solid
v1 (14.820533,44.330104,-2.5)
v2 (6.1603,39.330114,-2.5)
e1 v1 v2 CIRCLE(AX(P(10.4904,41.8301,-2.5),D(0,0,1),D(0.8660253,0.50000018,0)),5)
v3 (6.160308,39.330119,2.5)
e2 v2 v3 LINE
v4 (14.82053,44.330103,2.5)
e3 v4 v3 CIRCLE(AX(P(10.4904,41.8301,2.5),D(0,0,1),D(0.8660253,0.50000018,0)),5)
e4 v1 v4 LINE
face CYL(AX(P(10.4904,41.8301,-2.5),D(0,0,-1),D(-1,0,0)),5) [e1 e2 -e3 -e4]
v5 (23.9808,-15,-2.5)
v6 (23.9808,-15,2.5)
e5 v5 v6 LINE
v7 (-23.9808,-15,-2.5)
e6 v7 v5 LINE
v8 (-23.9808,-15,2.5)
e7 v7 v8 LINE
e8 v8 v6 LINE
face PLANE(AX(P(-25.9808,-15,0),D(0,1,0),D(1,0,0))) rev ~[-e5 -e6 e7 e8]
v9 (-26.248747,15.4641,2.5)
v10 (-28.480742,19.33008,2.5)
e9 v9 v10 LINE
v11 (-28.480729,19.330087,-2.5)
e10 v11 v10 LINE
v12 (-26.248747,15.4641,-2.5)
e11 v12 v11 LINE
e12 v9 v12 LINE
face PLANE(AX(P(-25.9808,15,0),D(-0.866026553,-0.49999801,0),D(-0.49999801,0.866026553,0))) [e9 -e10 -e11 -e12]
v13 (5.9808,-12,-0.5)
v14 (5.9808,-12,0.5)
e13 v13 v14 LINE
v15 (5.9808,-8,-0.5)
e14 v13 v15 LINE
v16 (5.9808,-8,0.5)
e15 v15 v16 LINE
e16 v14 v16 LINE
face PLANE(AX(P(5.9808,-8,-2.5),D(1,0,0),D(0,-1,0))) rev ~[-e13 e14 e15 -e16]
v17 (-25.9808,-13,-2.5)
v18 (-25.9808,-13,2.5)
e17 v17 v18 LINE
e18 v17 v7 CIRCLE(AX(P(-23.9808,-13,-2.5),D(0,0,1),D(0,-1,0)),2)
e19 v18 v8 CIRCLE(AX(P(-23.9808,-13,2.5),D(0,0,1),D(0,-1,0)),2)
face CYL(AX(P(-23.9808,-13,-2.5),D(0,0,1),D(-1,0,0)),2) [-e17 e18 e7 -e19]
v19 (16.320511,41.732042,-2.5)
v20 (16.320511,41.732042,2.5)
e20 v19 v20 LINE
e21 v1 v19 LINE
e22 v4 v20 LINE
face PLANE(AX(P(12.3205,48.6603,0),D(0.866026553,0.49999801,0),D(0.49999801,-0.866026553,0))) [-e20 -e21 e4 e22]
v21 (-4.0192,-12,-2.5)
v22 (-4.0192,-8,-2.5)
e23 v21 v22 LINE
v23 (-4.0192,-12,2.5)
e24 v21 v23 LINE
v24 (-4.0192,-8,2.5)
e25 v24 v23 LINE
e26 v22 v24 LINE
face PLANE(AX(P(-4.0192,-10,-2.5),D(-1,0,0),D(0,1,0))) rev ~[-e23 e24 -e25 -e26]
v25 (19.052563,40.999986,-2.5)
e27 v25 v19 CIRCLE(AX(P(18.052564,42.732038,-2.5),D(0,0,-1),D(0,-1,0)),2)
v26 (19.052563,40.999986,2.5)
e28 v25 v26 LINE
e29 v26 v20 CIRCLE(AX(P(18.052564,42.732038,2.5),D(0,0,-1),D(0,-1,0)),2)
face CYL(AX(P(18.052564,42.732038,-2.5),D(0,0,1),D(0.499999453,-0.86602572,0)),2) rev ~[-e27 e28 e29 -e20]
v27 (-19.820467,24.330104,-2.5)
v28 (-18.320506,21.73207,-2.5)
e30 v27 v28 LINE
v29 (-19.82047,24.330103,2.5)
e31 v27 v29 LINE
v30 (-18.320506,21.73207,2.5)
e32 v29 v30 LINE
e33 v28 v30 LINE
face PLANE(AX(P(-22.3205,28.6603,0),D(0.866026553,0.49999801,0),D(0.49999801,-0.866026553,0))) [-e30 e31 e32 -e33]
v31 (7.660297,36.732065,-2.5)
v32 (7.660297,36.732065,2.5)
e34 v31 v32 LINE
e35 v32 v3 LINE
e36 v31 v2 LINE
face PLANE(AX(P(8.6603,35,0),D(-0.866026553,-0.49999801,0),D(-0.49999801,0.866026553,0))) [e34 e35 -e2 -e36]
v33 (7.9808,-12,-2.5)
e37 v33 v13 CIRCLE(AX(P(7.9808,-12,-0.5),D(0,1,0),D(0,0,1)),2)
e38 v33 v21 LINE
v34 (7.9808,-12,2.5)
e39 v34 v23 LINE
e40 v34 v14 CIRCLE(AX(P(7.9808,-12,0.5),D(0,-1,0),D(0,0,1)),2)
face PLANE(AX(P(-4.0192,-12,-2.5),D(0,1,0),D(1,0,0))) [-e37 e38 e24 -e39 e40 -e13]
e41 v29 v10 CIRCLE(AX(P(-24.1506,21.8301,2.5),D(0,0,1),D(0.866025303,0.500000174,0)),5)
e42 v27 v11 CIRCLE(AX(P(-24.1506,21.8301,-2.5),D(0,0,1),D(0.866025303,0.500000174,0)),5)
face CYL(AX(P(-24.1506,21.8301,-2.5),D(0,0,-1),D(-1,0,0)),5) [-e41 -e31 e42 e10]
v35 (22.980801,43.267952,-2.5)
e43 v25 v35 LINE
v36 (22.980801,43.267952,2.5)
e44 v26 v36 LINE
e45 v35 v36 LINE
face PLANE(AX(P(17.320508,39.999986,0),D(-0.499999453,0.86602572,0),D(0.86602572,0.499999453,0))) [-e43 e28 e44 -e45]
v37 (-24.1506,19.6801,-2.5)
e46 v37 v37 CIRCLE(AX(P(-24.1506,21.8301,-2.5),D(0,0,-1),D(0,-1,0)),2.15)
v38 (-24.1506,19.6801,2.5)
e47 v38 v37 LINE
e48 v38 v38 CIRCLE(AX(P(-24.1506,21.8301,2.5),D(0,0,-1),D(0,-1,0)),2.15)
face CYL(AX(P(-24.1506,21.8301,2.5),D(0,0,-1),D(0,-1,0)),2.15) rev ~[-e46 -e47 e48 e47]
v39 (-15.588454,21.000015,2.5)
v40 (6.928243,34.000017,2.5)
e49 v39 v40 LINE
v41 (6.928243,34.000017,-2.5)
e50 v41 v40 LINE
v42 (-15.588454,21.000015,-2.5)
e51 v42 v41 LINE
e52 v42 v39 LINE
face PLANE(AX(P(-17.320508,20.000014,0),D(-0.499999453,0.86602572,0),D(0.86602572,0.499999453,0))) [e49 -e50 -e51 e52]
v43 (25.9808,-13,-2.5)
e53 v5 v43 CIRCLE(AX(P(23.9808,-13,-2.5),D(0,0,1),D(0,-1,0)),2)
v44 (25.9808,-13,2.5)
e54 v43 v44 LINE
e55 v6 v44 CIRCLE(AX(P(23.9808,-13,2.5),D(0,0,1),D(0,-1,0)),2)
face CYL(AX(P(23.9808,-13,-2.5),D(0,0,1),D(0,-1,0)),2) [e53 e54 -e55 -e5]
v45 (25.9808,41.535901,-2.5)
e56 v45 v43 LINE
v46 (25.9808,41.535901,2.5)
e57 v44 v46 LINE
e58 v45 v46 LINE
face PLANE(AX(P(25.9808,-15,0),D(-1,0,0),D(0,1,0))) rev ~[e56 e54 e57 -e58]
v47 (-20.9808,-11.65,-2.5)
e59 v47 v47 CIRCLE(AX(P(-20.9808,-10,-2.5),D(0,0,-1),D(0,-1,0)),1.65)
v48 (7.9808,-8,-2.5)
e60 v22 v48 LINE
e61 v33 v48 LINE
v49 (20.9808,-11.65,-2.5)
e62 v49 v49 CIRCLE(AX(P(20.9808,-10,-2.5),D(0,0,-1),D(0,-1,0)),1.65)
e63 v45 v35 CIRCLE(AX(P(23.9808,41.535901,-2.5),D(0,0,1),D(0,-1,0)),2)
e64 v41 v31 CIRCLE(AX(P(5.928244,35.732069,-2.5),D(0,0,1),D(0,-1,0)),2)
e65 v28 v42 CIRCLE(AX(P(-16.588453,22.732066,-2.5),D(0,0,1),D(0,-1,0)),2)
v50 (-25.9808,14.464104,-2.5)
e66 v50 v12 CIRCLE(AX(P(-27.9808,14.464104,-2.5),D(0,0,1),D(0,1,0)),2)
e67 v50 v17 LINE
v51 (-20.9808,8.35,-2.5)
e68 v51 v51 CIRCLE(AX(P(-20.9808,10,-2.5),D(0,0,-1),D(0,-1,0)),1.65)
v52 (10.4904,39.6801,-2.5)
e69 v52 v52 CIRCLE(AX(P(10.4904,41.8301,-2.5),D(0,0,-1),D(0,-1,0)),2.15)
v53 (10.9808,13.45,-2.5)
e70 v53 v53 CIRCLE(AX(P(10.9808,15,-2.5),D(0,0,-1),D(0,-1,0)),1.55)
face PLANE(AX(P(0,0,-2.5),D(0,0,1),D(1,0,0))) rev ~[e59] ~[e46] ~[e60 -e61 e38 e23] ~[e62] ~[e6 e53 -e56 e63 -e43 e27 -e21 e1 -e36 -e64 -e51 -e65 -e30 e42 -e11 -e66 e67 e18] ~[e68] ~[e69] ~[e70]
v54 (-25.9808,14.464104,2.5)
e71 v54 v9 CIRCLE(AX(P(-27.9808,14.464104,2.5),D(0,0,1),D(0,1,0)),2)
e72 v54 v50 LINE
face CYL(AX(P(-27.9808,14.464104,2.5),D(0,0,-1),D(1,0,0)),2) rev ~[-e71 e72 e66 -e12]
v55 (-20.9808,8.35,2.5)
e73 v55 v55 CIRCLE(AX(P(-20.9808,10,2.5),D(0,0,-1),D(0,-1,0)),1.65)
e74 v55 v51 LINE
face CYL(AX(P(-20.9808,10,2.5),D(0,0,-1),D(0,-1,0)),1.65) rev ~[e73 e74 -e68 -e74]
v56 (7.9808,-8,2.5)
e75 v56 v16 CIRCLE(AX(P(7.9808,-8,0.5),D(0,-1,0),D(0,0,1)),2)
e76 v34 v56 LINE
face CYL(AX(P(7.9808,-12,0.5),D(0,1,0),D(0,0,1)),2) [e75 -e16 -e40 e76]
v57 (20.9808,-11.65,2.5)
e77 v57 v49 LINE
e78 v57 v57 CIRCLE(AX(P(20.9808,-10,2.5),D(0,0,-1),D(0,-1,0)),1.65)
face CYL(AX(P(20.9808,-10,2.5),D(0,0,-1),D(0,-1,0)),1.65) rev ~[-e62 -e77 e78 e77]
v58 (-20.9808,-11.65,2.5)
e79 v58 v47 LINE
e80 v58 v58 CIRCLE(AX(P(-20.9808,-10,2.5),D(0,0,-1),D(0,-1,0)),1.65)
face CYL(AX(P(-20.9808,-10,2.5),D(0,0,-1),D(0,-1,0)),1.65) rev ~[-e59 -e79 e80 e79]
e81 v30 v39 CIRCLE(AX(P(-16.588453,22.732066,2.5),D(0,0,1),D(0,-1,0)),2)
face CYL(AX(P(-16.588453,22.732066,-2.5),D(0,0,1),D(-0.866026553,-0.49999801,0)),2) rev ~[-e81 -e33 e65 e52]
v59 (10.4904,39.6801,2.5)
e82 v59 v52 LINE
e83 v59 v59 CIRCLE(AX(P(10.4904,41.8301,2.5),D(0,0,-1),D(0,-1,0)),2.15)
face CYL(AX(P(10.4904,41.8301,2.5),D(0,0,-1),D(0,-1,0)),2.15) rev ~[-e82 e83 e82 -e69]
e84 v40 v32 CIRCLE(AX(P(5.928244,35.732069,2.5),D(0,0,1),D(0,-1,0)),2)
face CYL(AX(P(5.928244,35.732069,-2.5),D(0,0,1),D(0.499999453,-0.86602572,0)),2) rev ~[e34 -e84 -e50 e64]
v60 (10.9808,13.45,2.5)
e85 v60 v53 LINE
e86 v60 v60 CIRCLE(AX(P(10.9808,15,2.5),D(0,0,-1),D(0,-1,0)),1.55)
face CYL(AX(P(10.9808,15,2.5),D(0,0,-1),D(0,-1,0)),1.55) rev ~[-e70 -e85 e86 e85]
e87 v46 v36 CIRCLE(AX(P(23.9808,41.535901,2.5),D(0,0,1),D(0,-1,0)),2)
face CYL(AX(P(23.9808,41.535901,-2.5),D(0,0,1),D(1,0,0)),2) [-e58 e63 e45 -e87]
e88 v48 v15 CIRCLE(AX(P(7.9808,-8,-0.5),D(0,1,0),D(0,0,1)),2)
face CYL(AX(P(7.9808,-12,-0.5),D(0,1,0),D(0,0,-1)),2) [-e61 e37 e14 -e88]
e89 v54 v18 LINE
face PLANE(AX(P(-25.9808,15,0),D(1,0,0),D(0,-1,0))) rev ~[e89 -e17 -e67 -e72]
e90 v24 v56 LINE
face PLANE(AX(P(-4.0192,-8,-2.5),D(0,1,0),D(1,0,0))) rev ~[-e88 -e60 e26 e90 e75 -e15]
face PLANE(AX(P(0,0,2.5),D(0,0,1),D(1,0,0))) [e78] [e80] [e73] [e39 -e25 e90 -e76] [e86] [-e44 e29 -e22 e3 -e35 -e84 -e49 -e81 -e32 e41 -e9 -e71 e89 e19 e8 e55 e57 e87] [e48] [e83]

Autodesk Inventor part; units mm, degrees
ref_plane "YZ Plane" through (0, 0, 0) normal (1, 0, 0) x (0, 1, 0)
ref_plane "XZ Plane" through (0, 0, 0) normal (0, 1, 0) x (-1, 0, 0)
ref_plane "XY Plane" through (0, 0, 0) normal (0, 0, 1) x (1, 0, 0)
sketch "スケッチ1" plane through (0, 0, 0) normal (0, 0, 1) x (1, 0, 0)
  line L0 (-25.9808, -15) -> (25.9808, -15)
  line L1 (25.9808, -15) -> (25.9808, 15)
  line L2 (25.9808, 15) -> (-25.9808, 15)
  line L3 (-25.9808, 15) -> (-25.9808, -15)
  line L4 (-25.9808, -15) -> (25.9808, 15) construction
  line L5 (25.9808, -15) -> (-25.9808, 15) construction
  line L6 (-25.9808, 15) -> (25.9808, 45)
  line L7 (25.9808, 45) -> (25.9808, 15)
  line L8 (-25.9808, 15) -> (-30.9808, 23.6603)
  line L9 (-30.9808, 23.6603) -> (-22.3205, 28.6603)
  line L10 (-22.3205, 28.6603) -> (-17.3205, 20)
  line L11 (8.6603, 35) -> (3.6603, 43.6603)
  line L12 (3.6603, 43.6603) -> (12.3205, 48.6603)
  line L13 (12.3205, 48.6603) -> (17.3205, 40)
  point P0 (0, 0)
  dimension "d0" = 60
  dimension "d1" = 30
  dimension "d2" = 30
  dimension "d3" = 30
  dimension "d4" = 10
  dimension "d5" = 10
  dimension "d6" = 10
  dimension "d7" = 30
extrude "押し出し1" add sketch "スケッチ1" along normal mid plane 5
sketch "スケッチ2" plane through (0, 0, 2.5) normal (0, 0, 1) x (1, 0, 0)
  line L0 (-30.9808, 23.6603) -> (-25.9808, 15) projected
  line L1 (-25.9808, 15) -> (-25.9808, -15) projected
  line L2 (-25.9808, -15) -> (25.9808, -15) projected
  line L3 (25.9808, -15) -> (25.9808, 45) projected
  line L4 (25.9808, 45) -> (17.3205, 40) projected
  line L5 (17.3205, 40) -> (12.3205, 48.6603) projected
  line L6 (12.3205, 48.6603) -> (3.6603, 43.6603) projected
  line L7 (3.6603, 43.6603) -> (8.6603, 35) projected
  line L8 (8.6603, 35) -> (-17.3205, 20) projected
  line L9 (-17.3205, 20) -> (-22.3205, 28.6603) projected
  line L10 (-22.3205, 28.6603) -> (-30.9808, 23.6603) projected
  point P0 (0, 0)
  point P1 (-24.1506, 21.8301)
  point P2 (10.4904, 41.8301)
  dimension "d10" = 5
  dimension "d11" = 5
  dimension "d12" = 5
  dimension "d13" = 5
hole "穴1" at (-24.1506, 21.8301, 2.5) at (10.4904, 41.8301, 2.5) direction (0, 0, -1) diameter 4.3 end through all
sketch "スケッチ4" plane through (0, 0, 2.5) normal (0, 0, 1) x (1, 0, 0)
  line L0 (-25.9808, -15) -> (25.9808, -15) projected
  line L1 (25.9808, -15) -> (25.9808, 45) projected
  point P0 (0, 0)
  point P1 (10.9808, 15)
  dimension "d30" = 30
  dimension "d31" = 15
hole "穴2" at (10.9808, 15, 2.5) direction (0, 0, -1) diameter 3.1 end through all
sketch "スケッチ5" plane through (0, 0, 2.5) normal (0, 0, 1) x (1, 0, 0)
  line L0 (-25.9808, 15) -> (-25.9808, -15) projected
  line L1 (-25.9808, -15) -> (25.9808, -15) projected
  line L2 (25.9808, -15) -> (25.9808, 45) projected
  point P0 (0, 0)
  point P1 (-20.9808, 10)
  point P2 (-20.9808, -10)
  point P3 (20.9808, -10)
  dimension "d39" = 5
  dimension "d40" = 5
  dimension "d41" = 5
  dimension "d42" = 20
  dimension "d43" = 5
  dimension "d44" = 5
hole "穴3" at (-20.9808, 10, 2.5) at (-20.9808, -10, 2.5) at (20.9808, -10, 2.5) direction (0, 0, -1) diameter 3.3 end through all
sketch "スケッチ7" plane through (0, 0, -2.5) normal (0, 0, -1) x (-1, 0, 0)
  line L0 (-25.9808, -15) -> (25.9808, -15) projected
  line L1 (-25.9808, 45) -> (-25.9808, -15) projected
  line L2 (-5.9808, -10) -> (4.0192, -10)
  line L3 (4.0192, -10) -> (4.0192, -12)
  line L4 (4.0192, -12) -> (-5.9808, -12)
  line L5 (-5.9808, -12) -> (-5.9808, -10)
  line L6 (-5.9808, -10) -> (4.0192, -10)
  line L7 (4.0192, -10) -> (4.0192, -8)
  line L8 (4.0192, -8) -> (-5.9808, -8)
  line L9 (-5.9808, -8) -> (-5.9808, -10)
  point P0 (0, 0)
  dimension "d52" = 5
  dimension "d53" = 20
  dimension "d54" = 5
  dimension "d55" = 10
  dimension "d56" = 2
  dimension "d57" = 2
extrude "押し出し3" cut sketch "スケッチ7" against normal blind 10
fillet "フィレット1" radius 2 2 edges at (5.9808, -10, 2.5) (5.9808, -10, -2.5)
fillet "フィレット2" radius 2 7 edges at (17.3205, 40, 0) (25.9808, 45, 0) (-17.3205, 20, 0) (8.6603, 35, 0) (-25.9808, 15, 0) (25.9808, -15, 0) (-25.9808, -15, 0)
sketch "スケッチ8" plane through (0, 0, -2.5) normal (0, 0, -1) x (-1, 0, 0)
  arc A0 (23.9808, -15) -> (25.9808, -13) centre (23.9808, -13) ccw projected
  line L0 (25.9808, -13) -> (25.9808, 14.4641) projected
  arc A1 (26.2487, 15.4641) -> (25.9808, 14.4641) centre (27.9808, 14.4641) ccw projected
  line L1 (26.2487, 15.4641) -> (30.9808, 23.6603) projected
  line L2 (30.9808, 23.6603) -> (22.3205, 28.6603) projected
  line L3 (22.3205, 28.6603) -> (18.3205, 21.7321) projected
  arc A2 (15.5885, 21) -> (18.3205, 21.7321) centre (16.5885, 22.7321) ccw projected
  line L4 (15.5885, 21) -> (-6.9282, 34) projected
  arc A3 (-7.6603, 36.7321) -> (-6.9282, 34) centre (-5.9282, 35.7321) ccw projected
  line L5 (-7.6603, 36.7321) -> (-3.6603, 43.6603) projected
  line L6 (-3.6603, 43.6603) -> (-12.3205, 48.6603) projected
  line L7 (-12.3205, 48.6603) -> (-16.3205, 41.7321) projected
  arc A4 (-19.0526, 41) -> (-16.3205, 41.7321) centre (-18.0526, 42.7321) ccw projected
  line L8 (-19.0526, 41) -> (-22.9808, 43.2679) projected
  arc A5 (-22.9808, 43.2679) -> (-25.9808, 41.5359) centre (-23.9808, 41.5359) ccw projected
  line L9 (-25.9808, 41.5359) -> (-25.9808, -13) projected
  arc A6 (-25.9808, -13) -> (-23.9808, -15) centre (-23.9808, -13) ccw projected
  line L10 (-23.9808, -15) -> (23.9808, -15) projected
  circle A7 centre (24.1506, 21.8301) radius 2.15 projected
  circle A8 centre (-10.4904, 41.8301) radius 2.15 projected
  circle A9 centre (-10.9808, 15) radius 1.55 projected
  circle A10 centre (20.9808, 10) radius 1.65 projected
  circle A11 centre (20.9808, -10) radius 1.65 projected
  circle A12 centre (-20.9808, -10) radius 1.65 projected
  line L11 (-7.9808, -8) -> (4.0192, -8) projected
  line L12 (4.0192, -8) -> (4.0192, -12) projected
  line L13 (4.0192, -12) -> (-7.9808, -12) projected
  line L14 (-7.9808, -8) -> (-7.9808, -12) projected
  circle A13 centre (-10.4904, 41.8301) radius 5
  circle A14 centre (24.1506, 21.8301) radius 5
  point P0 (0, 0)
  point P1 (19.8205, 24.3301)
  point P2 (26.6506, 26.1603)
  point P3 (28.4808, 19.3301)
  point P4 (-14.8205, 44.3301)
  point P5 (-7.9904, 46.1603)
  point P6 (-6.1603, 39.3301)
extrude "押し出し4" cut sketch "スケッチ8" against normal blind 10 contours A14 L2 L1 | L3 L2 A14 | L7 L6 A13 | L6 L5 A13
equation "\"d5\" = d4"
equation "\"d6\" = d4"
equation "\"d11\" = d10"
equation "\"d12\" = d10"
equation "\"d13\" = d10"
equation "\"d40\" = d39"
equation "\"d41\" = d39"
equation "\"d43\" = d39"
equation "\"d44\" = d39"
equation "\"d54\" = d52"
equation "\"d56\" = d57"
properties part number "ベースパーツ1"
